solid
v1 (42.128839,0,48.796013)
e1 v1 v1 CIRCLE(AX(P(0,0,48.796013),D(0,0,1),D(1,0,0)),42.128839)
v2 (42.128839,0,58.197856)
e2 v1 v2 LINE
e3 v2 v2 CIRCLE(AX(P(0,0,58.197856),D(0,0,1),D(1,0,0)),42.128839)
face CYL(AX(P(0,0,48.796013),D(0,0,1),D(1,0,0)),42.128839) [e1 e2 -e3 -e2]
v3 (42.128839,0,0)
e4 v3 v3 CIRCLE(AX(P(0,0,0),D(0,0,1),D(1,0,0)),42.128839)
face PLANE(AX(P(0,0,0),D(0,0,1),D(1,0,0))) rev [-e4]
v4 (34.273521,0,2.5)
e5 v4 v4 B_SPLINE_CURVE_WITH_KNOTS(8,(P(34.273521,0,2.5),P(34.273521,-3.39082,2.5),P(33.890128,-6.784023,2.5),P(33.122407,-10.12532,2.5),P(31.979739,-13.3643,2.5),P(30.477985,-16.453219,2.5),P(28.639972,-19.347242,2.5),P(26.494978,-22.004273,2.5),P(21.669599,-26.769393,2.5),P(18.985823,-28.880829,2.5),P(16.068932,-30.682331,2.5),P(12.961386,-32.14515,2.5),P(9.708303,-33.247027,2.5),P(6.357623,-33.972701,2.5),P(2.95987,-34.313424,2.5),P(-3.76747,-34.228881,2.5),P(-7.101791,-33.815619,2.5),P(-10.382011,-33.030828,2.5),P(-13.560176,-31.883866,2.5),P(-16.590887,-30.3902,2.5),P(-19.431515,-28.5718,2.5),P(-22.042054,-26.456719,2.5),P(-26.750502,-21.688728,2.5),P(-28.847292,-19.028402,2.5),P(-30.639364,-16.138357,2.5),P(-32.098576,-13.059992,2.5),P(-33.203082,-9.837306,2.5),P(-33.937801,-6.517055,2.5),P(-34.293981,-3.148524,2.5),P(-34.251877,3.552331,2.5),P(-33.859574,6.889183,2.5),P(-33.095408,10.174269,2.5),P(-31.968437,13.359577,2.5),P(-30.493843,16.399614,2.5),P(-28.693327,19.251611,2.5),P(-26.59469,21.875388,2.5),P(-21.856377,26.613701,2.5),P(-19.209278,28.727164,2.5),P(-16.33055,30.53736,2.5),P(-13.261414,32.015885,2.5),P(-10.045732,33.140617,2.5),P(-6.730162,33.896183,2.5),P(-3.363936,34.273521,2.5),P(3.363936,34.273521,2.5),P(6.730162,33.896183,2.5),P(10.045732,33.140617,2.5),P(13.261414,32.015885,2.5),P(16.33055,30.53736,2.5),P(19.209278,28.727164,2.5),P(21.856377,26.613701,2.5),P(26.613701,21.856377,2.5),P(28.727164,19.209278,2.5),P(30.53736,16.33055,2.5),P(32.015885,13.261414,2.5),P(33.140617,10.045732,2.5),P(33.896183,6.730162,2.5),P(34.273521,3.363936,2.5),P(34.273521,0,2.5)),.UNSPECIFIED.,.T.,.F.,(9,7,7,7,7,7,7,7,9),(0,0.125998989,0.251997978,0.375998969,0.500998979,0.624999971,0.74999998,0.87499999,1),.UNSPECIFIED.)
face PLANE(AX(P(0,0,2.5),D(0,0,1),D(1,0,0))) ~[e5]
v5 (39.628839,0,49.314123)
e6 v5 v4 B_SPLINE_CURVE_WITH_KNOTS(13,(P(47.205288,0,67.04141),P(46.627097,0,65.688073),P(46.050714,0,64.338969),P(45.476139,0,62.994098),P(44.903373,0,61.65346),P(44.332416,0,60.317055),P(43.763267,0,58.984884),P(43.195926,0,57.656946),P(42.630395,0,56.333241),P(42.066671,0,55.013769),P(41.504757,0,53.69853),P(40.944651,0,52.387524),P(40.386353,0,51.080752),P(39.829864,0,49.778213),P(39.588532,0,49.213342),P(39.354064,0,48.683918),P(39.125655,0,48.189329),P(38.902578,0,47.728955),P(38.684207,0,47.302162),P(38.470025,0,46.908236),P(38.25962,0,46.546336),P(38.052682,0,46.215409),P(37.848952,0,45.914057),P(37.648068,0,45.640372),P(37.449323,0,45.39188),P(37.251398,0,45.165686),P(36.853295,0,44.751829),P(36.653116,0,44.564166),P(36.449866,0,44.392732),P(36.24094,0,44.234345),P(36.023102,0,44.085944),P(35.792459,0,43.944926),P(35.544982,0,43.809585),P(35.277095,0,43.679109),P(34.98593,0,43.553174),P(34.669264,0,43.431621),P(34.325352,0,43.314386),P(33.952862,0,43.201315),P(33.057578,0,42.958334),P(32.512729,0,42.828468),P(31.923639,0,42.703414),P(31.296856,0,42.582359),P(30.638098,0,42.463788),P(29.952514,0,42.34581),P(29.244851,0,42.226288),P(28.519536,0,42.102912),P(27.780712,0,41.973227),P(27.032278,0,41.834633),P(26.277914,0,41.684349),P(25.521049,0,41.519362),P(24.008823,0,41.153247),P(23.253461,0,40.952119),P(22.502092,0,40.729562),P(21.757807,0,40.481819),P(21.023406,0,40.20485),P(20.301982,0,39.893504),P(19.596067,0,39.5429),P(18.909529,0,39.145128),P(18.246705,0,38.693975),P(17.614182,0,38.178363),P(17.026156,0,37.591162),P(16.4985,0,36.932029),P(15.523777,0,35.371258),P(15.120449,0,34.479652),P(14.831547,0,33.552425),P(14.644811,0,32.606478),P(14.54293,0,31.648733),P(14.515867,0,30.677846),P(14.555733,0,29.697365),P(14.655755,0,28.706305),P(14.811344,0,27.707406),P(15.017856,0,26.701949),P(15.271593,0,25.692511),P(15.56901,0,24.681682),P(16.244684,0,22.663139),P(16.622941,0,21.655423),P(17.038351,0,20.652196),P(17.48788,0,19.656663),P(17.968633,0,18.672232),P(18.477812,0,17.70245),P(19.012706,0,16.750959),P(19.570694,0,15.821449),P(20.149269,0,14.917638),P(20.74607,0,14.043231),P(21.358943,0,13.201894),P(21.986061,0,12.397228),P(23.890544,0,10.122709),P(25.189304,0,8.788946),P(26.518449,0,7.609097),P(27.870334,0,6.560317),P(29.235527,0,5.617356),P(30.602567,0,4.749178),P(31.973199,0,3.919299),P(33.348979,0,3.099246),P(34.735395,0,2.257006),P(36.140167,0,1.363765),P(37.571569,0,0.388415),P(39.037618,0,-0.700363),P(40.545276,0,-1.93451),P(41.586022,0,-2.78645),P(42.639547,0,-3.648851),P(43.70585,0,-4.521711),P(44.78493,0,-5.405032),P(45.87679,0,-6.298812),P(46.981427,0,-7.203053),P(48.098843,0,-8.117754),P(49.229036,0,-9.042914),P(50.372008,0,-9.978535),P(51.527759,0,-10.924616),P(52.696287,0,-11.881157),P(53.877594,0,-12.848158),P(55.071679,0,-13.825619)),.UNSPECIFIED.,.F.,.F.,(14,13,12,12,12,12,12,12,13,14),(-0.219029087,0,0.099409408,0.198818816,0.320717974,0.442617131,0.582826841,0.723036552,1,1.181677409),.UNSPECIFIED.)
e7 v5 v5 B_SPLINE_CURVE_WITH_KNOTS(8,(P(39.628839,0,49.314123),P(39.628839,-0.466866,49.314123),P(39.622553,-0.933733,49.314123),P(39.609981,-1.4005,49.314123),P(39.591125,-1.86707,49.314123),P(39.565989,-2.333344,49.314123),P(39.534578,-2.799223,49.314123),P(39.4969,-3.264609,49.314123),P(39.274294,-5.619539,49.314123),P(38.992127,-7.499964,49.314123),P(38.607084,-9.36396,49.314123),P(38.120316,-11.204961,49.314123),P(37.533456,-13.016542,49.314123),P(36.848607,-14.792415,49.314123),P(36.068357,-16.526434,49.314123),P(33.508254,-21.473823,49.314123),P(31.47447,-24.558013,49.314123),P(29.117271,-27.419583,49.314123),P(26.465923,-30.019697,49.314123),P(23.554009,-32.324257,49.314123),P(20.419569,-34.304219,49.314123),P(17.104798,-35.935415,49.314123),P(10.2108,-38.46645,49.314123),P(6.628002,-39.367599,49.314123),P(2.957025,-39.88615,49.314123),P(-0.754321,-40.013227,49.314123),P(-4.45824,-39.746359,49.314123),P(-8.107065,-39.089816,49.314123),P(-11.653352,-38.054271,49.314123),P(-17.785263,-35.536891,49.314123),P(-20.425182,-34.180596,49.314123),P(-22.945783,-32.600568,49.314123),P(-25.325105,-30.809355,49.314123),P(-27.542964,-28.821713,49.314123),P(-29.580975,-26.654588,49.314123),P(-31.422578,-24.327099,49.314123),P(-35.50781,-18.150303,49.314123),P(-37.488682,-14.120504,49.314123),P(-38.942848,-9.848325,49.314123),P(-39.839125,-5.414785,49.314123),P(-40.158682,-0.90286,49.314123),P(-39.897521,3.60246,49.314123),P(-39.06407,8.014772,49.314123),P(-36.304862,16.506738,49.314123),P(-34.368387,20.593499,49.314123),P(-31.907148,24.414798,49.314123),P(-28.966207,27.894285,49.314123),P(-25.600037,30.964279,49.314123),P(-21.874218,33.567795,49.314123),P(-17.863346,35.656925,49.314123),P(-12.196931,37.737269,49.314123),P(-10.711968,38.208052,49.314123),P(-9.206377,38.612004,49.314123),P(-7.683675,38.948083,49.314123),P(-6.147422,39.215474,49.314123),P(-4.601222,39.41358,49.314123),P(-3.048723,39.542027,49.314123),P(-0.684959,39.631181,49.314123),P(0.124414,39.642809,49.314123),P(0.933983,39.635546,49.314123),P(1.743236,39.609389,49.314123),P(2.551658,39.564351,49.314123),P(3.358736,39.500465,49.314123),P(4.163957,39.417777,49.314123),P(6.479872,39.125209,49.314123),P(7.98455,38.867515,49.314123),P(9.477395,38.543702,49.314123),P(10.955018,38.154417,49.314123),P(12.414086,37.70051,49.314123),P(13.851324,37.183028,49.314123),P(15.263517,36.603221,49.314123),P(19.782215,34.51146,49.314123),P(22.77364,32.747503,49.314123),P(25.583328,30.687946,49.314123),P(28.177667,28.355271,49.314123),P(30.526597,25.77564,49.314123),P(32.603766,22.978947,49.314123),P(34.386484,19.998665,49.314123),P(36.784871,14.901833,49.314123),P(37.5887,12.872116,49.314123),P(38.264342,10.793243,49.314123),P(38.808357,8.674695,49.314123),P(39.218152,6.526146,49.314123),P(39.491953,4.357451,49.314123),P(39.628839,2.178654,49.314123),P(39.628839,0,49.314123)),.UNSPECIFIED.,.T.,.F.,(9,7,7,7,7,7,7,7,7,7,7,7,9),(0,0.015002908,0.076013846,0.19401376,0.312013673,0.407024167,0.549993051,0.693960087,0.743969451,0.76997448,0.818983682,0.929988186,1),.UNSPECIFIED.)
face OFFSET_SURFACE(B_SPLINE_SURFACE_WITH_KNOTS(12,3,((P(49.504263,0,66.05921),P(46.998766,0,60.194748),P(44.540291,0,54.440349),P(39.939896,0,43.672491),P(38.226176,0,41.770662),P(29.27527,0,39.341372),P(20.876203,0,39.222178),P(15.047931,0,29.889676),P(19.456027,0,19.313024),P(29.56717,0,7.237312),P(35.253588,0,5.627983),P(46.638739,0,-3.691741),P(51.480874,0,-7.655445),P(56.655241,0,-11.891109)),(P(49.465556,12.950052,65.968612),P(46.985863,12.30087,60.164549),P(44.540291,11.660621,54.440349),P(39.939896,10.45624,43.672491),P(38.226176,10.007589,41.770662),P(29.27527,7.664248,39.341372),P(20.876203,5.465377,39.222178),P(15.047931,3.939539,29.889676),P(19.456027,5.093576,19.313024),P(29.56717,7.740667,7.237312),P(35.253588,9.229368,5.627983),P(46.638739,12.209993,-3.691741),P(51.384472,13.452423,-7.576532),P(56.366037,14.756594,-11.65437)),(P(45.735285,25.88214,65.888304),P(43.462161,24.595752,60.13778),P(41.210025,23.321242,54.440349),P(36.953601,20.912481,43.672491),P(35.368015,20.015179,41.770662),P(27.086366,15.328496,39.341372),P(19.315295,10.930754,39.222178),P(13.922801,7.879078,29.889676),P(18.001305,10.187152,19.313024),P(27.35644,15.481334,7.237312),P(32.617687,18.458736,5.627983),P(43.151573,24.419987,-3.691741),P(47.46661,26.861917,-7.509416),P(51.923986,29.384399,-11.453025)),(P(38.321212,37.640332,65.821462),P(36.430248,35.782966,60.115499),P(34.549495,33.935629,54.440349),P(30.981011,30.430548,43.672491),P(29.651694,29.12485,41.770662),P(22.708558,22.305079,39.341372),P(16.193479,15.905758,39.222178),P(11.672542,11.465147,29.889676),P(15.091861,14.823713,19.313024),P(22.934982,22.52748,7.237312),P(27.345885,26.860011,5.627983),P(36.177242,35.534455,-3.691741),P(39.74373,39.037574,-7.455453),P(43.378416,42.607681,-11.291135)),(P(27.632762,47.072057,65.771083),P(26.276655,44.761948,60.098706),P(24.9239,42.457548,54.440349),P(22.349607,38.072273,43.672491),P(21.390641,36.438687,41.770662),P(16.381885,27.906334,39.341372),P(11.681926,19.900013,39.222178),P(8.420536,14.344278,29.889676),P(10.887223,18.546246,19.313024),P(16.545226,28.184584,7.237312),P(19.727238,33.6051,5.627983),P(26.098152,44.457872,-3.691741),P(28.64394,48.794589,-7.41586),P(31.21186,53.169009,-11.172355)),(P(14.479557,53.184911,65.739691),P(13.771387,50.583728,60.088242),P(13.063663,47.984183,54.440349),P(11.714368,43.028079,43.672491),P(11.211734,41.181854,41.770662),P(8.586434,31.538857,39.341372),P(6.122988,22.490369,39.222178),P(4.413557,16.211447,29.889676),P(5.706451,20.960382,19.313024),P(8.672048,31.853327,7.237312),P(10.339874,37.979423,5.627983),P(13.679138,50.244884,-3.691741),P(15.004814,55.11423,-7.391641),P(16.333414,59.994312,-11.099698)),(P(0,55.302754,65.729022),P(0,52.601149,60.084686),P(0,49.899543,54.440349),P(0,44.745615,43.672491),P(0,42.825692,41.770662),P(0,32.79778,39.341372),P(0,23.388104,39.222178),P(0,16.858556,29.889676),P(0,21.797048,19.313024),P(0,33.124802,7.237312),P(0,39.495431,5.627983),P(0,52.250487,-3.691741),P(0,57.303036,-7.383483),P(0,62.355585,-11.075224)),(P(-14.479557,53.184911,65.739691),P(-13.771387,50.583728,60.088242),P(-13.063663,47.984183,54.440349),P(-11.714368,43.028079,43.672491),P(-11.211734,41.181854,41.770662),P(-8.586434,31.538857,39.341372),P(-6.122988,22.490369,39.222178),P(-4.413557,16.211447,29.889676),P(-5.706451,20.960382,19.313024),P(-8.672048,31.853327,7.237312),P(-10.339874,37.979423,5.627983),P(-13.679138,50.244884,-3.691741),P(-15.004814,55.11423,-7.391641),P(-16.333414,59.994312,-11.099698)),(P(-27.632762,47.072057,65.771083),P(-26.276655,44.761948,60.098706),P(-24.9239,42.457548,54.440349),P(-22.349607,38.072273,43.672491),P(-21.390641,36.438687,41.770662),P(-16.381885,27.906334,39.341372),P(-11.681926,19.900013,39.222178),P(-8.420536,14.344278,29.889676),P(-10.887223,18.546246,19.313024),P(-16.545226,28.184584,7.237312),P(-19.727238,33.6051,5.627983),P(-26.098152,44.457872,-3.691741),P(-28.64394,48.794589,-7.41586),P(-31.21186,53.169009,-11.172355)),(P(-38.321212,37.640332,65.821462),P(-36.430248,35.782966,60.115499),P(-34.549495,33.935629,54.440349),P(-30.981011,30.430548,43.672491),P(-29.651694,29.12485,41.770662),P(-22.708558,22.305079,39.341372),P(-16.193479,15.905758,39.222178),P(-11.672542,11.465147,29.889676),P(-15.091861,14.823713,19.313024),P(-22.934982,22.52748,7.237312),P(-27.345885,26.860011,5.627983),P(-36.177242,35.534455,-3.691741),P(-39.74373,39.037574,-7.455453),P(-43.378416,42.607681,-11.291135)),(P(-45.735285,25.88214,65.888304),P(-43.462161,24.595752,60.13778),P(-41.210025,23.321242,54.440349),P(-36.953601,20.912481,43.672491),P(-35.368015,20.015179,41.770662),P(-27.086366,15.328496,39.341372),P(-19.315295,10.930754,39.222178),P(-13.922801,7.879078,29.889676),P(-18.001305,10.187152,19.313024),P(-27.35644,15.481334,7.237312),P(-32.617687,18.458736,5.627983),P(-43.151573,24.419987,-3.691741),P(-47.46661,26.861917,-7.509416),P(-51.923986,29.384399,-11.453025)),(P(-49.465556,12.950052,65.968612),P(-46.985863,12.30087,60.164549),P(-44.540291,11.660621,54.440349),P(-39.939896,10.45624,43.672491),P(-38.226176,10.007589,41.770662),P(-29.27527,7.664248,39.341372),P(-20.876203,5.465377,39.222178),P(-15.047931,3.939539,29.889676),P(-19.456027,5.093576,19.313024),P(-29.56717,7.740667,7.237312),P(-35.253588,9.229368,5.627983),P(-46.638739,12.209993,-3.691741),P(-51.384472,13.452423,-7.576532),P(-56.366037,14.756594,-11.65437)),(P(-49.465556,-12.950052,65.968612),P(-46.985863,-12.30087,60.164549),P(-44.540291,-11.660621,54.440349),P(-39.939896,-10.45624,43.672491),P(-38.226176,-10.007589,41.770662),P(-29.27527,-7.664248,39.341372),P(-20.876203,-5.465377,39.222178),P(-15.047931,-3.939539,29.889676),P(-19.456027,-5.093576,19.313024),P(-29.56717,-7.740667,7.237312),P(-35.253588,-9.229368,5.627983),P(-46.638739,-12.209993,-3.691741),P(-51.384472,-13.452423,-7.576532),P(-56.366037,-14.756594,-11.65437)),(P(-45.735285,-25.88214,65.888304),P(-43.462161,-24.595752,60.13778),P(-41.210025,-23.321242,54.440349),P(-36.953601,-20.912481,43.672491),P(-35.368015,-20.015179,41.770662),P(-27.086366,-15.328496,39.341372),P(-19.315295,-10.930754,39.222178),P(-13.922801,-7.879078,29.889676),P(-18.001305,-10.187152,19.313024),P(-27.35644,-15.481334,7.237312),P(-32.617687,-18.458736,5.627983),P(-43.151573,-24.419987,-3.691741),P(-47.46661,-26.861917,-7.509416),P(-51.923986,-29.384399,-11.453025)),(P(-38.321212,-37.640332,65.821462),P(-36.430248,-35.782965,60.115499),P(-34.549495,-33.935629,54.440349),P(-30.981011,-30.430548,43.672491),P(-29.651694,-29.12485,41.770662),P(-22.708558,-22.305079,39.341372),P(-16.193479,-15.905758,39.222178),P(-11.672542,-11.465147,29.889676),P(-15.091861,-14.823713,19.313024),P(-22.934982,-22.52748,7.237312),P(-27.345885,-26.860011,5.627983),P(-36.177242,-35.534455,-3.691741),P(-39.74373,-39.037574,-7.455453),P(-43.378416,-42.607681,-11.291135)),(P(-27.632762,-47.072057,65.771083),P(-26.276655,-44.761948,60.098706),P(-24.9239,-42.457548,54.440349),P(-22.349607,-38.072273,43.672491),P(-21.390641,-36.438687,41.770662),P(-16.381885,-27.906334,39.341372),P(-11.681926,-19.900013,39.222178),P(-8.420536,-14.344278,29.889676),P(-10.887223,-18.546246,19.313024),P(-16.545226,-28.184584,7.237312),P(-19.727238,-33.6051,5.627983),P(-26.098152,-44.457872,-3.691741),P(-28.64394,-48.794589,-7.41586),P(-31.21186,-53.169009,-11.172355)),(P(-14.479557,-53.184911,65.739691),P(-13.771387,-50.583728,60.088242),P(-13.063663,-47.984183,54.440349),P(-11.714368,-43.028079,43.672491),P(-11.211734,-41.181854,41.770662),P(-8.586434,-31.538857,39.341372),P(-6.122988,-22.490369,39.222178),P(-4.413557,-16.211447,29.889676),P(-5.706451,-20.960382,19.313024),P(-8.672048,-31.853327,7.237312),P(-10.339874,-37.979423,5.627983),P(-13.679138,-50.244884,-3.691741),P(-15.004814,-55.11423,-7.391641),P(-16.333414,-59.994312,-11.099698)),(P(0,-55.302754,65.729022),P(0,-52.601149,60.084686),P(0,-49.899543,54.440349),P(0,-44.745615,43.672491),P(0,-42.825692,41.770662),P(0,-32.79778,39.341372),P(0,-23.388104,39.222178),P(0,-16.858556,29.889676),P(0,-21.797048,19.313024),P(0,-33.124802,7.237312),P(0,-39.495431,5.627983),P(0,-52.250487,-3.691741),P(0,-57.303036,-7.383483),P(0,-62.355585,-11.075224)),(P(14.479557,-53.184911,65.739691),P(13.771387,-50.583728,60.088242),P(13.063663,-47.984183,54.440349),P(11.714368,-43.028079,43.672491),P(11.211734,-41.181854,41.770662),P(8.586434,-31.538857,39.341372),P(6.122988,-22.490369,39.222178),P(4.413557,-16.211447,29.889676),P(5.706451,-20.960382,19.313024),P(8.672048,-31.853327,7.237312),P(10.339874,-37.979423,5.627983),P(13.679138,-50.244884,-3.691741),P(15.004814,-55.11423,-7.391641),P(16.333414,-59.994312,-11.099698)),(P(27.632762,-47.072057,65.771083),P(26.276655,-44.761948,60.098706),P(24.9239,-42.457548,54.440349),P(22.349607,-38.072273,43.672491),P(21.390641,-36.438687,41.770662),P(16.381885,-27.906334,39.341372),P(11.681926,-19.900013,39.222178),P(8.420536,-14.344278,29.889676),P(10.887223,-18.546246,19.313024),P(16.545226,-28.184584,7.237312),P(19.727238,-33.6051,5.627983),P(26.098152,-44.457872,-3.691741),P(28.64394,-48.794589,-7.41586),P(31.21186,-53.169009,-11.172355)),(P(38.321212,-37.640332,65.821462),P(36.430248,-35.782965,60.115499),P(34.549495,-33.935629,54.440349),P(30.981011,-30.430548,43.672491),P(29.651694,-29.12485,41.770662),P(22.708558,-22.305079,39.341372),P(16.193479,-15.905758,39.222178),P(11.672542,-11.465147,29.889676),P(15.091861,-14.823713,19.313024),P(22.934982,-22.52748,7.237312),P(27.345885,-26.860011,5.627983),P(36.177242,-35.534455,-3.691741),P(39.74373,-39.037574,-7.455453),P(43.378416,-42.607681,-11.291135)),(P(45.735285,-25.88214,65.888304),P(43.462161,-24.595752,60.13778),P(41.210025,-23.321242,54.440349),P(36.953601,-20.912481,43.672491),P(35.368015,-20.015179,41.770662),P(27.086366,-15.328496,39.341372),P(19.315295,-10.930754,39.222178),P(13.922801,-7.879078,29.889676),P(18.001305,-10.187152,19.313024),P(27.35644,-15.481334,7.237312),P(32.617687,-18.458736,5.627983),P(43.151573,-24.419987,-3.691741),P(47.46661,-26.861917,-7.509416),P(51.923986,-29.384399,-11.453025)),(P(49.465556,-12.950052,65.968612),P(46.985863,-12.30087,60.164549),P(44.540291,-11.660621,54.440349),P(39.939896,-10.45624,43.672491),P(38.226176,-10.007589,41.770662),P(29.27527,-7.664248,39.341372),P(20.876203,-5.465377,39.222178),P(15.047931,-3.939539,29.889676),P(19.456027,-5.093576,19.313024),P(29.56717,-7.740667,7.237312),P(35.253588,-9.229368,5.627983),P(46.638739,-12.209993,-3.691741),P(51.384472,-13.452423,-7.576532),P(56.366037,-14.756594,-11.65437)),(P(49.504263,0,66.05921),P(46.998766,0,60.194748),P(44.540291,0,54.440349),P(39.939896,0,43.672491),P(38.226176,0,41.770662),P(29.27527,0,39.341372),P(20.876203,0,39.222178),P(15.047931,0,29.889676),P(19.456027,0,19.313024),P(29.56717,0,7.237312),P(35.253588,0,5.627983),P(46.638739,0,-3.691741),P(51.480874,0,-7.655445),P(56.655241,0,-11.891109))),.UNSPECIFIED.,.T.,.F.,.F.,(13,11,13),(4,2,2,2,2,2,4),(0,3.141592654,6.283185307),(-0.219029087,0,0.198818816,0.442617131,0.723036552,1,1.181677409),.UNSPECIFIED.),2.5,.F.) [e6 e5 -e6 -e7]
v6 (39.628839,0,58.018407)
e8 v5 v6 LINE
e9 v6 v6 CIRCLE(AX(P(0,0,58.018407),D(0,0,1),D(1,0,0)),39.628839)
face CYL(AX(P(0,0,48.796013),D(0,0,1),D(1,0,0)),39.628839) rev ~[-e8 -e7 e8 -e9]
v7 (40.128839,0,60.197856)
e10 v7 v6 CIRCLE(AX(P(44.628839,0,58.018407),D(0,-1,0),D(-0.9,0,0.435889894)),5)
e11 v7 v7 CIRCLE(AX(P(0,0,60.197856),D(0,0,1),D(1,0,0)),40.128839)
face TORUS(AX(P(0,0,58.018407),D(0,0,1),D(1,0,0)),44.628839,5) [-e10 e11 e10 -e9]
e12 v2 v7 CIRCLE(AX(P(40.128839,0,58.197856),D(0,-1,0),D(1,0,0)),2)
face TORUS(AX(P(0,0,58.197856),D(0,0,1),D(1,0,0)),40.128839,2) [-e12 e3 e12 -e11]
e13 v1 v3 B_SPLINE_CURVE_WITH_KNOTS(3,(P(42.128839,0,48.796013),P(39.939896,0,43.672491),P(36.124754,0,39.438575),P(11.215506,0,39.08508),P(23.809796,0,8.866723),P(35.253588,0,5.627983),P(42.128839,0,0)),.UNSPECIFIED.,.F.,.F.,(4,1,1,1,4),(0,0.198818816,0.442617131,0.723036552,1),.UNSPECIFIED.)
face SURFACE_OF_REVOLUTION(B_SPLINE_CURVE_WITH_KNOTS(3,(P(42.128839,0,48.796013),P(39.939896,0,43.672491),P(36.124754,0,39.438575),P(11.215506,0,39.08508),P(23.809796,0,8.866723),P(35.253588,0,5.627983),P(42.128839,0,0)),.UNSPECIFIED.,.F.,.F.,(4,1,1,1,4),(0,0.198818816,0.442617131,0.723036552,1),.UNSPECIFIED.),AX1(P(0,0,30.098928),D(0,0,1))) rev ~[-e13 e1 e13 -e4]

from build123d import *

# Parameters (mm, degrees)
F2_T = -2.5
F3_R = 2


# Not quite as in the source:
# - a fillet or chamfer that OpenCascade refuses, or shapes differently, is made with other operations: its cross-section is extruded or revolved along the edge and cut away or added


with BuildPart() as f1:
    # F0 (on Front) → F1 (revolve)
    with BuildSketch(Plane.XZ):
        with BuildLine():
            Line((0, 60.1978562772), (0, 0))
            Line((0, 0), (42.1288385987, 0))
            add(Edge.make_bspline(
                [(42.1288385987, 48.7960129976), (39.9398960957, 43.6724913074), (36.124754332, 39.4385747799), (11.2155060179, 39.0850801193), (23.809795732, 8.8667225507), (35.2535881514, 5.627983428), (42.1288385987, 0)],
                knots=[0, 0, 0, 0, 0.1988188163, 0.4426171309, 0.7230365515, 1, 1, 1, 1], degree=3))
            Line((42.1288385987, 48.7960129976), (42.1288385987, 60.1978562772))
            Line((42.1288385987, 60.1978562772), (0, 60.1978562772))
        make_face()
    revolve(axis=Axis((0, 0, 30.0989281386), (0, 0, 1)))

    # F2
    f2_openings = [f1.faces().sort_by_distance(p)[0] for p in [
        (0, 0, 60.197856),
    ]]
    offset(amount=F2_T, openings=f2_openings, kind=Kind.INTERSECTION)

    # F3
    f3_edges = [f1.edges().sort_by_distance(p)[0] for p in [
        (-42.128839, 0, 60.197856),
    ]]
    fillet(f3_edges, radius=F3_R)

    # F4: fillet of radius 5 on 1 edges, made by hand

    # F4_s1 → F4_t2 (revolve, cut)
    with BuildSketch(Plane.XZ):
        with BuildLine():
            ThreePointArc((40.1288385987, 60.1978562772), (39.7554414263, 59.1364407942), (39.6288385987, 58.0184068055))
            Line((39.6288385987, 58.0184068055), (39.6288385987, 60.1978562772))
            Line((39.6288385987, 60.1978562772), (40.1288385987, 60.1978562772))
        make_face()
    revolve(axis=Axis((0, 0, 60.1978562772), (0, 0, 1)), mode=Mode.SUBTRACT)


solid = f1.part
